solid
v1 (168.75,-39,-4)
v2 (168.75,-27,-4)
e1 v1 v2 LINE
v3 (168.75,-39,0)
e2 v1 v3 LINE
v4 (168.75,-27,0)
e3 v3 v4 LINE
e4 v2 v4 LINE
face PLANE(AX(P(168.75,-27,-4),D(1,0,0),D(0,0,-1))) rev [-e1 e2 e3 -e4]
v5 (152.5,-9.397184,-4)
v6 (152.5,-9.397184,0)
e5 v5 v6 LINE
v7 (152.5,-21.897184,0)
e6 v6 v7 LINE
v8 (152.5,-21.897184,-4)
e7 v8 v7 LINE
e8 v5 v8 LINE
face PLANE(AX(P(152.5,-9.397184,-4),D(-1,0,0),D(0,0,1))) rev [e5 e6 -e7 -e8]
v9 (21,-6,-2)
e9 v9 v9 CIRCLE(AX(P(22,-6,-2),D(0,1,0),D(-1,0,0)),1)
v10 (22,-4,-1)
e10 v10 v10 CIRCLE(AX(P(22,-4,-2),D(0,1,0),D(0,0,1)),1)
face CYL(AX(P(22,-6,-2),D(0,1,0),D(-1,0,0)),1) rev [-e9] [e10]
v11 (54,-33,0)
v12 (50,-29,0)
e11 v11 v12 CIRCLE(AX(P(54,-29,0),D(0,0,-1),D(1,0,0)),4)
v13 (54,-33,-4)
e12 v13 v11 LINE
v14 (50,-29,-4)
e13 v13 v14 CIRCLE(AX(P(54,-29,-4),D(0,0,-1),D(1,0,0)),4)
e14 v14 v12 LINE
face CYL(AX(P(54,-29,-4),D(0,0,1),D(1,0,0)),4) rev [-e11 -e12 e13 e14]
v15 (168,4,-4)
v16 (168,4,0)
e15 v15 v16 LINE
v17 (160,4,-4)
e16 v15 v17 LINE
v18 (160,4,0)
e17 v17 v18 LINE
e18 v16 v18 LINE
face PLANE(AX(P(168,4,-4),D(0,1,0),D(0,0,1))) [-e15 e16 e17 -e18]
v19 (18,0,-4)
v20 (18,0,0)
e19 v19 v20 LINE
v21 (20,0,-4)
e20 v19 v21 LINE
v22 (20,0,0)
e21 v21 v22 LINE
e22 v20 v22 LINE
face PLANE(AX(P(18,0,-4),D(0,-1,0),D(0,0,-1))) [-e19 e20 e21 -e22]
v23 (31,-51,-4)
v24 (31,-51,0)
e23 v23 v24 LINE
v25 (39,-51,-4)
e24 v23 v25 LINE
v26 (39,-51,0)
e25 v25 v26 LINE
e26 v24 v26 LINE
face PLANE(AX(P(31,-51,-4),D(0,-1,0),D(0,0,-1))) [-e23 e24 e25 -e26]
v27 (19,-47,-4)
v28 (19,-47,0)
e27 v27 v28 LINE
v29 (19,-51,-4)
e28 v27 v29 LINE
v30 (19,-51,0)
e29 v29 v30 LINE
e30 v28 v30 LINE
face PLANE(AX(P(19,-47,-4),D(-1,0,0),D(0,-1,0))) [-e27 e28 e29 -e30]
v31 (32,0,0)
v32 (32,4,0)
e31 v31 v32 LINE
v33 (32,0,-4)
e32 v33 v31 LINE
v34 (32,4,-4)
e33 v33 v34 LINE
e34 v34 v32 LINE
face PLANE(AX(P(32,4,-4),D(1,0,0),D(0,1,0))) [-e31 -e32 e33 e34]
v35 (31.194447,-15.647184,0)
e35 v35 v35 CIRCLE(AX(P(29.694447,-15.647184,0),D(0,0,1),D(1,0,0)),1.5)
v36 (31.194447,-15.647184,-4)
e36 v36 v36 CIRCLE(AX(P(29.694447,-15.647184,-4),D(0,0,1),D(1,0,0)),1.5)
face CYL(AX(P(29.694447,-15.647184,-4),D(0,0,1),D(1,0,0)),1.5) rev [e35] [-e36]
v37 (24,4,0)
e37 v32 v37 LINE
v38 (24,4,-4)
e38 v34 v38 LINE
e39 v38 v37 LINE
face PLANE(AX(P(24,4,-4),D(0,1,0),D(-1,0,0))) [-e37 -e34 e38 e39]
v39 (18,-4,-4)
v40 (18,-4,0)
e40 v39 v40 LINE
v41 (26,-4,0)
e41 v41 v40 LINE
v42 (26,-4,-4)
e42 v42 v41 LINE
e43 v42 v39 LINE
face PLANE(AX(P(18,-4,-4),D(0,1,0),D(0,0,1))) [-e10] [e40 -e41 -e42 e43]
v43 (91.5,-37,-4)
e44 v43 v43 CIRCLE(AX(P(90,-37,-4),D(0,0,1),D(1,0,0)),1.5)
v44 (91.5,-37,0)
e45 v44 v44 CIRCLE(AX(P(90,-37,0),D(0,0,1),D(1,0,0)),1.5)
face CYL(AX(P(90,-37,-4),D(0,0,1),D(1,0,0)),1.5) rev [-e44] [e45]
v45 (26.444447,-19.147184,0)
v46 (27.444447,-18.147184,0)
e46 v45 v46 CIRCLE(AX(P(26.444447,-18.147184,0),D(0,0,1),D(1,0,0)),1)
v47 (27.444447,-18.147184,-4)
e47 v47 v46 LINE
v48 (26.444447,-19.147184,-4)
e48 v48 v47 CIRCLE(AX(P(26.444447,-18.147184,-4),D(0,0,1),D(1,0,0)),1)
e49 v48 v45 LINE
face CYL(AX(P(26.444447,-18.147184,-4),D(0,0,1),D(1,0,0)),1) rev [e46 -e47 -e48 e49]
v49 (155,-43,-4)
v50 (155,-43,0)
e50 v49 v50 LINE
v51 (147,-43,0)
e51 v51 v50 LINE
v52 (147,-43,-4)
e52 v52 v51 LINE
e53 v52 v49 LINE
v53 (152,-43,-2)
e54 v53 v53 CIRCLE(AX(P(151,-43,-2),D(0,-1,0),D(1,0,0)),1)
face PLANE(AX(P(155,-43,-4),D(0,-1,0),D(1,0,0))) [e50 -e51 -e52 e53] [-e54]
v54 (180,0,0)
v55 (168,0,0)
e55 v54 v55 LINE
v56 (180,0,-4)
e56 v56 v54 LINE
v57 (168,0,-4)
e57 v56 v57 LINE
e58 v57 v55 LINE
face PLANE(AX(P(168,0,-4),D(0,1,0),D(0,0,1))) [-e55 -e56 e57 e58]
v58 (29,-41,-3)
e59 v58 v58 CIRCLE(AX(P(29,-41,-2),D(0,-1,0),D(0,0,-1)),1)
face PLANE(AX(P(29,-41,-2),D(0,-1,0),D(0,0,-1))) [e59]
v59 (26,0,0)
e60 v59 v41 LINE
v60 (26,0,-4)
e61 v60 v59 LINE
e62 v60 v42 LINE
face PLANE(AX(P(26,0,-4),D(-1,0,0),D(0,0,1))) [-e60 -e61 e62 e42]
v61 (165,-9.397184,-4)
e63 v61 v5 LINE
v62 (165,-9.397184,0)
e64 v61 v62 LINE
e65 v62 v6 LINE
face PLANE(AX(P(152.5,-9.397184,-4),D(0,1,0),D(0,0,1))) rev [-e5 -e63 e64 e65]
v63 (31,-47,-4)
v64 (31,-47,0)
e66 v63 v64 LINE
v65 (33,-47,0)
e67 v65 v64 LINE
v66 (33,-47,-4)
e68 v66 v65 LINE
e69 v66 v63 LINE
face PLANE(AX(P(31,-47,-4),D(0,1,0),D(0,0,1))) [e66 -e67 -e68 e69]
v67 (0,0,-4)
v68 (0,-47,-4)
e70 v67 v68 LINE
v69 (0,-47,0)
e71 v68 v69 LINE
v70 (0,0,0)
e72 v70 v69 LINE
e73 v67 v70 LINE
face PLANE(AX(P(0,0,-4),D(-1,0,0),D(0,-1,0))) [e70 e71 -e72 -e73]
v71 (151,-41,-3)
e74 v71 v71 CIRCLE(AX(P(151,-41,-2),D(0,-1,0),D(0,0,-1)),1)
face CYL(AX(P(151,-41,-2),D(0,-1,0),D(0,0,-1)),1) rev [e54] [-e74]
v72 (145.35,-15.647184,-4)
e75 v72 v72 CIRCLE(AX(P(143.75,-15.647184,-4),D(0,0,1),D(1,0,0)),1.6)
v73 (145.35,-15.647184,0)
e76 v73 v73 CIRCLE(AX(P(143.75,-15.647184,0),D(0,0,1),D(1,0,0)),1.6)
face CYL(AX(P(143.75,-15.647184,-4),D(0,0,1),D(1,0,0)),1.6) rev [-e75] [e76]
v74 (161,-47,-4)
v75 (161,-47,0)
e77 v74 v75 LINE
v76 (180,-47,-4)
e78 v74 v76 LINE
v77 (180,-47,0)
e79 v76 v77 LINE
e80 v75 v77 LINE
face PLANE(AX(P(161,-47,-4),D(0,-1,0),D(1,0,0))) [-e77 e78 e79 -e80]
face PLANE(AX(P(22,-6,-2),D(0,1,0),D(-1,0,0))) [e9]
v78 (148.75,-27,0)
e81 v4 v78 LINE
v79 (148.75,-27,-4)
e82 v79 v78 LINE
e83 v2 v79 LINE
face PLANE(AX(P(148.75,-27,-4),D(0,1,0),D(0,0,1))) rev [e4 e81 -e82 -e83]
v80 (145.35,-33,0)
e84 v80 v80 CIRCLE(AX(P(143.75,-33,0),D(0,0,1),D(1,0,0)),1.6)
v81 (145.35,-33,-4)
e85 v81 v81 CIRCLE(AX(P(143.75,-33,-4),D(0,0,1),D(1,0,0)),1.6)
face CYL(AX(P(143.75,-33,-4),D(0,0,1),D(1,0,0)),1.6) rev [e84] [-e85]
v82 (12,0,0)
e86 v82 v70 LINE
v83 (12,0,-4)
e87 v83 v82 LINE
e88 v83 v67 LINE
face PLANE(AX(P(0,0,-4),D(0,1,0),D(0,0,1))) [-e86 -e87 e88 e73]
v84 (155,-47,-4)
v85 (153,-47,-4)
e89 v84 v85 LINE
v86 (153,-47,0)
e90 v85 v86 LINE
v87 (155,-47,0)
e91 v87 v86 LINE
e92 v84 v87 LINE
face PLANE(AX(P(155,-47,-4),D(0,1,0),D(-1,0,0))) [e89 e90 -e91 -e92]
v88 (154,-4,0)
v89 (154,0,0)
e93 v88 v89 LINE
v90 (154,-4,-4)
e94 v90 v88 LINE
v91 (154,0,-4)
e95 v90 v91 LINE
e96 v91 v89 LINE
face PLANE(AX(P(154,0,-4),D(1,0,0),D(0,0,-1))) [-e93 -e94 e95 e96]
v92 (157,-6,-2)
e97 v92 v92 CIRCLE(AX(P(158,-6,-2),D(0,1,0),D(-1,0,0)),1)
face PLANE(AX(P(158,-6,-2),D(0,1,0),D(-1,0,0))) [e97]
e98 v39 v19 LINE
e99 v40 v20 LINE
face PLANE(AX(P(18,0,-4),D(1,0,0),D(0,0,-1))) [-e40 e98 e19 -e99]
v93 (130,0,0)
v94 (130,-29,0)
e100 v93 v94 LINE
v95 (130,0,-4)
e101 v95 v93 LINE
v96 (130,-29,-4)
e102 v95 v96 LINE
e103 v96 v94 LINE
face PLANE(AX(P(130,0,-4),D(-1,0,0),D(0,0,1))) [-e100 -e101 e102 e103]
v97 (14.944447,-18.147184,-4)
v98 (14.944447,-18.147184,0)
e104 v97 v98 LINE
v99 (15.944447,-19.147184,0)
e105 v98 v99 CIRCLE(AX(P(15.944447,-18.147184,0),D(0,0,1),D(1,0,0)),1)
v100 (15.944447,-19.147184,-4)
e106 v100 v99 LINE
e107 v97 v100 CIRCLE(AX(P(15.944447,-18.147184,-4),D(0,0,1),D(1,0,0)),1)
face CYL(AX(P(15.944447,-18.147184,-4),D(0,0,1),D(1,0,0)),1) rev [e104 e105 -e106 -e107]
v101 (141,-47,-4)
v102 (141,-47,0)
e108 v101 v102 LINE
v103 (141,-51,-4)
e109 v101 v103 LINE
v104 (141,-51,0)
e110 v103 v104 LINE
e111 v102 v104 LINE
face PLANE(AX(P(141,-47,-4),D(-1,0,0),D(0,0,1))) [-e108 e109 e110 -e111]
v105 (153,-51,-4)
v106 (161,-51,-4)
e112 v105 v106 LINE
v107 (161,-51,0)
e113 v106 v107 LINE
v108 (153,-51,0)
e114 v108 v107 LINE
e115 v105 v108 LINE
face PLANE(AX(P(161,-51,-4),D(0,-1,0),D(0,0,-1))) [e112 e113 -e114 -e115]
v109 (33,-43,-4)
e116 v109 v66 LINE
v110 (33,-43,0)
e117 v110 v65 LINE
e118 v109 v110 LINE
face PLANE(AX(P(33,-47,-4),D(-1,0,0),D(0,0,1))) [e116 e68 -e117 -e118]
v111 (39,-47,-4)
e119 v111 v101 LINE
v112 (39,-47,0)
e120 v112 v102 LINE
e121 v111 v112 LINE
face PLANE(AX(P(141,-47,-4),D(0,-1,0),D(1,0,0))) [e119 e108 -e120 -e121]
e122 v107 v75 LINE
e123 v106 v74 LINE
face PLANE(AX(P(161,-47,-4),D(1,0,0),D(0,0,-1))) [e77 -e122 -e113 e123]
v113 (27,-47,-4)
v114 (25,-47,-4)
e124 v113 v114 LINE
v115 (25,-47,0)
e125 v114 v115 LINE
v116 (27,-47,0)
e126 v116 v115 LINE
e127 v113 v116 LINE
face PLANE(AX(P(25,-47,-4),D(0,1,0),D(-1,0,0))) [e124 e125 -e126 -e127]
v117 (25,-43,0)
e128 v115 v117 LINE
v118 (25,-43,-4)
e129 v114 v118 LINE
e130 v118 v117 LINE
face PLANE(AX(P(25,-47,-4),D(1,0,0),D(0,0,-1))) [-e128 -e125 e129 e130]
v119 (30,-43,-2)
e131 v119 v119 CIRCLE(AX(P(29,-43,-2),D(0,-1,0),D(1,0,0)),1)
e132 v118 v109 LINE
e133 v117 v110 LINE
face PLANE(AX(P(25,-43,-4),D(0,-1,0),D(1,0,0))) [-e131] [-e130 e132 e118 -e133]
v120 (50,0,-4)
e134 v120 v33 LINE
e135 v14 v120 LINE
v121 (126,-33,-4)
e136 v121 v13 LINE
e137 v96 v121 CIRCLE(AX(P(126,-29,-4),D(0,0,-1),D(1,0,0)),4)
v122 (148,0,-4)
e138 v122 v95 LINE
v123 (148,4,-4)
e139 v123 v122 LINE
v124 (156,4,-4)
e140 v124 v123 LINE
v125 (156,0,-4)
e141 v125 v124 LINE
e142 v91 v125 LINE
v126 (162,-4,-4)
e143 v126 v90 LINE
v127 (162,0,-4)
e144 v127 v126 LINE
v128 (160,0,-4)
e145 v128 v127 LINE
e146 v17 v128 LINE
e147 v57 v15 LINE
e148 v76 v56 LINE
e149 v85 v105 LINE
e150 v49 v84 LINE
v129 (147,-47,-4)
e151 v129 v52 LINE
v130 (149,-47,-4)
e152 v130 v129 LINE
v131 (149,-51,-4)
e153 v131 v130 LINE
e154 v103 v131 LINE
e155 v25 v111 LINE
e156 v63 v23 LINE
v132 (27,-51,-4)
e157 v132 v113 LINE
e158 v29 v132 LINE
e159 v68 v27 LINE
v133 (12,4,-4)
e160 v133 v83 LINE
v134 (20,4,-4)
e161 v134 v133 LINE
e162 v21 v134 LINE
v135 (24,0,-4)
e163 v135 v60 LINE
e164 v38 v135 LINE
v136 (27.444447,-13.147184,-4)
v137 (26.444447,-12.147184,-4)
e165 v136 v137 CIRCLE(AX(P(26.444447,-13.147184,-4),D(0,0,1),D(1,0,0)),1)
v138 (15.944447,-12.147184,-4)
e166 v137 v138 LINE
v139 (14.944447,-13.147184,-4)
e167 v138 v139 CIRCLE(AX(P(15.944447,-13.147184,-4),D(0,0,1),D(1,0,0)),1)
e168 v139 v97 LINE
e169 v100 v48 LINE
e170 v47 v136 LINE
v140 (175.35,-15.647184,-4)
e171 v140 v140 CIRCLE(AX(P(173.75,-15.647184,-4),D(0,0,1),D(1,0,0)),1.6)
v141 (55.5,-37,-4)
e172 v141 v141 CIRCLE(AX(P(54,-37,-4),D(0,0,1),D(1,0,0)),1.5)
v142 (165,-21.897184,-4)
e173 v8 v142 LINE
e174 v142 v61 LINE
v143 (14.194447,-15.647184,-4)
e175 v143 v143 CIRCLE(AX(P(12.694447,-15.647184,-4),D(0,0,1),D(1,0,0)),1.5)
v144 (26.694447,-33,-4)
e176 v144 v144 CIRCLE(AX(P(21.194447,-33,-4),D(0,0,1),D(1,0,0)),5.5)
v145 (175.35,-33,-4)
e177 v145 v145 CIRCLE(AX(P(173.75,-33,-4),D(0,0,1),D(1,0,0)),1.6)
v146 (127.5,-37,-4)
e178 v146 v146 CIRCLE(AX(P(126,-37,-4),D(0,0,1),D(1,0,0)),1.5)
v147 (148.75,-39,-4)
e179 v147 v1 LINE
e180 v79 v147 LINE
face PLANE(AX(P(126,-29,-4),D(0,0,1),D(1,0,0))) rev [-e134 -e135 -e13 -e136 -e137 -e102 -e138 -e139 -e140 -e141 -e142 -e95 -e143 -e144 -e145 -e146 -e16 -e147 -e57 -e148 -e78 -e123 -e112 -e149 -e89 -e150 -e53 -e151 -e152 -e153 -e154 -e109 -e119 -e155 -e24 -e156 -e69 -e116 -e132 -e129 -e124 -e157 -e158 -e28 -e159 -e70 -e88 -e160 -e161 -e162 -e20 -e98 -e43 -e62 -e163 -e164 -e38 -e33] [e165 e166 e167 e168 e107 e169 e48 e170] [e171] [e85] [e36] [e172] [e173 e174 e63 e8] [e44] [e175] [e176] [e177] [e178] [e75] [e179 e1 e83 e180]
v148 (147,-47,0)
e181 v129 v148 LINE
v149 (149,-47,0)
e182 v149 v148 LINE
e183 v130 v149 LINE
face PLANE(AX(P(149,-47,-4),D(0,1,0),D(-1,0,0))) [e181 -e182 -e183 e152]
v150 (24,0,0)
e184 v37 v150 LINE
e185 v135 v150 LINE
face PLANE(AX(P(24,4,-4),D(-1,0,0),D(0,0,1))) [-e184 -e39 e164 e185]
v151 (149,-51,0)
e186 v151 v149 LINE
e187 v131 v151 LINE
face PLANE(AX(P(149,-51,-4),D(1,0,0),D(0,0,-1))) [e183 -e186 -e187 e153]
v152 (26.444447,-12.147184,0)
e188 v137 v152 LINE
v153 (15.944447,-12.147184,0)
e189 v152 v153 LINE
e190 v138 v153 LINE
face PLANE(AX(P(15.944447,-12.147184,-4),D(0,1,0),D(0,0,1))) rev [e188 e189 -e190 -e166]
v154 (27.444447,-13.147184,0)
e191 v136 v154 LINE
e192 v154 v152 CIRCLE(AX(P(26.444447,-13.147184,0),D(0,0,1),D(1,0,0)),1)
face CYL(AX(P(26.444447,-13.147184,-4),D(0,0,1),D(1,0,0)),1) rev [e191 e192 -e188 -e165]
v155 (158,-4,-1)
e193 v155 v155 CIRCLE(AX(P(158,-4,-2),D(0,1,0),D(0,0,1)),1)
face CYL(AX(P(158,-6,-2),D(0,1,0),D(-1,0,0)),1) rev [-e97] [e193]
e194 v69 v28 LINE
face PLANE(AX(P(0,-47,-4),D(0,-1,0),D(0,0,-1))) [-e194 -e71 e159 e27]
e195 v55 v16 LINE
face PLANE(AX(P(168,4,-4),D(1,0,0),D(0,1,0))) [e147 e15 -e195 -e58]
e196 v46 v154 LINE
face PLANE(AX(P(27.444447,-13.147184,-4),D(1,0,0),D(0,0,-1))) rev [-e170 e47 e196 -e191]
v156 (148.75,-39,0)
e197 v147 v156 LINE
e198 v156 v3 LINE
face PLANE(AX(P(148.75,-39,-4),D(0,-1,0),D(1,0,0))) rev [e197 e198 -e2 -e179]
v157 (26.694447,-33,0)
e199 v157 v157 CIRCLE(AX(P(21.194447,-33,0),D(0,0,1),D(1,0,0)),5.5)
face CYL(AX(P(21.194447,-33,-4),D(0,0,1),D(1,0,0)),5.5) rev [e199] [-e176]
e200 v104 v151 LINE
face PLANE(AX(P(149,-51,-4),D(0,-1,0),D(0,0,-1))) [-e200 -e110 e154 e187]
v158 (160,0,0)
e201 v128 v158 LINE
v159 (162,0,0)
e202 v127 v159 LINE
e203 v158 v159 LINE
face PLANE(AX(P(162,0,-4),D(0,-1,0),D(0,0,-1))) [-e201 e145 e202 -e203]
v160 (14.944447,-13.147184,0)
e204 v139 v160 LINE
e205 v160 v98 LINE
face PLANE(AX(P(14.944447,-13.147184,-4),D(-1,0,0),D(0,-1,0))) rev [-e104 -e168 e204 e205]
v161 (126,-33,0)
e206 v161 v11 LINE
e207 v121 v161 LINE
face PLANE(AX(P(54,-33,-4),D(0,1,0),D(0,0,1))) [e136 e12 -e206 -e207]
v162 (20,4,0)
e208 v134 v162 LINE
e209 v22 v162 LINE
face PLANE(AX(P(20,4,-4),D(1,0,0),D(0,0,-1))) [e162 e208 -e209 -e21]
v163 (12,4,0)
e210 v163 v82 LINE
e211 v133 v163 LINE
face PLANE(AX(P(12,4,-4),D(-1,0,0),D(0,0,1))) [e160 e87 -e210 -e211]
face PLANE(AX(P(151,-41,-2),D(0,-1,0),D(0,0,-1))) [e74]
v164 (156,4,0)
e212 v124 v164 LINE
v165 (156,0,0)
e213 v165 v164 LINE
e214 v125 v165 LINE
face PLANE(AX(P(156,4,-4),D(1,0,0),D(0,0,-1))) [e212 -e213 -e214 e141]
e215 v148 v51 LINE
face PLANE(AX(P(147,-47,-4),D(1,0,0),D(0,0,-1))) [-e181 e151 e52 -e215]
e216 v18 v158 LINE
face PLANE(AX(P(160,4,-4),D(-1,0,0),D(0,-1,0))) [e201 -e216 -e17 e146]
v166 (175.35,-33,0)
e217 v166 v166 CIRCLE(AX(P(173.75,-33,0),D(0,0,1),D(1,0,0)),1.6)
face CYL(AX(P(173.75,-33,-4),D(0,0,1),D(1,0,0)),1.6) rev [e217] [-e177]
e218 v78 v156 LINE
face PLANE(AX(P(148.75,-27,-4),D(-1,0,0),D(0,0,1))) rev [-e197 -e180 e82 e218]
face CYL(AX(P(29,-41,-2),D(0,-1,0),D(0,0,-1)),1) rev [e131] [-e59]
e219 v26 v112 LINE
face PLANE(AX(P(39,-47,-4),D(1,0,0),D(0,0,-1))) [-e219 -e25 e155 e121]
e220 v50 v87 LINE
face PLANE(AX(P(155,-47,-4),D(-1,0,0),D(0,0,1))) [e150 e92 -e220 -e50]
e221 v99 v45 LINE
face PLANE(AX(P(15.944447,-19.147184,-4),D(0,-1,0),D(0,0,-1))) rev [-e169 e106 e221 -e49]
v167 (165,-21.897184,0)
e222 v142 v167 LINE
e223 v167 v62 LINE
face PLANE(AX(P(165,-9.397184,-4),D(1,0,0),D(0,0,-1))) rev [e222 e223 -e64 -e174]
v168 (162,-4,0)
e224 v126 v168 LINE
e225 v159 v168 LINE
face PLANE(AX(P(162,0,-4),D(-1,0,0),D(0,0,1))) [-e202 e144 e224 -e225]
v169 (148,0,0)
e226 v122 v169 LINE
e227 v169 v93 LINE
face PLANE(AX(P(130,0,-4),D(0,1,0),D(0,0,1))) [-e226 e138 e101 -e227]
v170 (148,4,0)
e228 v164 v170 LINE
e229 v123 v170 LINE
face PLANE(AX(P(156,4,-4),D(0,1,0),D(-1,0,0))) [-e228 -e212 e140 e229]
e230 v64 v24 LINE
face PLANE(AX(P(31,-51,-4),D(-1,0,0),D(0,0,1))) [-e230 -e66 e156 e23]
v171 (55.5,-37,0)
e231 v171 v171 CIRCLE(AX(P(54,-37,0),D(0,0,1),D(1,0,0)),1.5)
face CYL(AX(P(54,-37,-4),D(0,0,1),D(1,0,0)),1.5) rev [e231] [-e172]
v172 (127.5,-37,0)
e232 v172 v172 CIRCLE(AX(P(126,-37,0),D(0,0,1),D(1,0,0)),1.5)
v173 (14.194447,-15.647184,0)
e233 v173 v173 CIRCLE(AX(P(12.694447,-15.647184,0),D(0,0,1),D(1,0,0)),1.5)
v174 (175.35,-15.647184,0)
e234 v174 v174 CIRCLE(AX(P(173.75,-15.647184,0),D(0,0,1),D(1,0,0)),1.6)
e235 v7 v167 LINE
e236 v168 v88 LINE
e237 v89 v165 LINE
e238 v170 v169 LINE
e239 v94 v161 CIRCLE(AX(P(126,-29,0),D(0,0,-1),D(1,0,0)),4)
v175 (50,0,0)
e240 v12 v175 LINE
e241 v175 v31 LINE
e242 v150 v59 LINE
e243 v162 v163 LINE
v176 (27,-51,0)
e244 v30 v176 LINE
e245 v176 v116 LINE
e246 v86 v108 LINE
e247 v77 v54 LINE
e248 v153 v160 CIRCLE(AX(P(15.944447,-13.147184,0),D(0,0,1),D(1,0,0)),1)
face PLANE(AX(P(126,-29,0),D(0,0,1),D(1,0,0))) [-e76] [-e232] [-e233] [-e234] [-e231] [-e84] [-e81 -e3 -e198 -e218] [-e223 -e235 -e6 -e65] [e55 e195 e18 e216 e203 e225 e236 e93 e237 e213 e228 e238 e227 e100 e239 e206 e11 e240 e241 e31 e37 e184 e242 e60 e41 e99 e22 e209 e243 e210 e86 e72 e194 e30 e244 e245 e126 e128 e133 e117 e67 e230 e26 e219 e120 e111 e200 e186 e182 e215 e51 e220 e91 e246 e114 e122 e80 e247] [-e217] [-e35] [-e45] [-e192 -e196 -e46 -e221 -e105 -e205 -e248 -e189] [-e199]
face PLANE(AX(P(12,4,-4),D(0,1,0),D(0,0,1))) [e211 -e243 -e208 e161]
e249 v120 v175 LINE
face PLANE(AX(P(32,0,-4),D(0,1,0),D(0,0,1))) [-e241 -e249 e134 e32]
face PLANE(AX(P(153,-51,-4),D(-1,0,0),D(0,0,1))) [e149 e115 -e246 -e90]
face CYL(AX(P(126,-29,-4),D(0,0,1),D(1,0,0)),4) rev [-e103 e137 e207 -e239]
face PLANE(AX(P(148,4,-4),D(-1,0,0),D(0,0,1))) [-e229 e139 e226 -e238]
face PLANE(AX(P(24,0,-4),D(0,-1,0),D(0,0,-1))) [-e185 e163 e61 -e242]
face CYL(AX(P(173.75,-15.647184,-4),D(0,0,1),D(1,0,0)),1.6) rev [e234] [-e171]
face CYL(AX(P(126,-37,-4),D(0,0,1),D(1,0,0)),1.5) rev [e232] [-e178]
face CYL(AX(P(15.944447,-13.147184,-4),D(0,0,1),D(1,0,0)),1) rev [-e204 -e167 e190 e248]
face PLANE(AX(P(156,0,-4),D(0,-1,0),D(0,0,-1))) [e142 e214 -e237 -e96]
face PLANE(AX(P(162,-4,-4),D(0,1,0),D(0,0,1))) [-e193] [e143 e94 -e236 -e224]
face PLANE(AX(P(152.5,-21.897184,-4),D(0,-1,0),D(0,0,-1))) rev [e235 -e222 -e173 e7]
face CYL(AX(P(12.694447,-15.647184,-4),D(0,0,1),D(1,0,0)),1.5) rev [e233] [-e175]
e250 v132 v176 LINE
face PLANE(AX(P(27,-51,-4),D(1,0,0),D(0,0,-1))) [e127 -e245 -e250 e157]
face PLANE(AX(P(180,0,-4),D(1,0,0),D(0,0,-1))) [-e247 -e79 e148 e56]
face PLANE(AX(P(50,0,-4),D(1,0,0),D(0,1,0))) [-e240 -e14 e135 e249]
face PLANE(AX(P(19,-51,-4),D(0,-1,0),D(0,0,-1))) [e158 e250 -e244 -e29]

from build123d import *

# Parameters (mm, degrees)
SKETCH_1_R             = 1.6
SKETCH_1_R_2           = 5.5
SKETCH_1_R_3           = 1.5
SKETCH_1_W             = 12.5
SKETCH_1_H             = 12.5
SKETCH_1_W_2           = 20
SKETCH_1_H_2           = 12
SM_BASE_FLANGE_1_DEPTH = 4
SKETCH_6_R             = 1
CUT_EXTRUDE_1_DEPTH    = 10
SKETCH_7_R             = 1
CUT_EXTRUDE_2_DEPTH    = 10


# Sheet-metal steps are written as plain solids
with BuildPart() as part:
    # Sketch 1 → Базовая кромка1 (new body)
    with BuildSketch(Plane.XY):
        with BuildLine():
            Line((0, 0), (12, 0))
            Line((12, 0), (12, 4))
            Line((12, 4), (20, 4))
            Line((20, 4), (20, 0))
            Line((20, 0), (18, 0))
            Line((18, 0), (18, -4))
            Line((18, -4), (26, -4))
            Line((26, -4), (26, 0))
            Line((26, 0), (24, 0))
            Line((24, 0), (24, 4))
            Line((24, 4), (32, 4))
            Line((32, 4), (32, 0))
            Line((32, 0), (50, 0))
            Line((50, 0), (50, -29))
            ThreePointArc((50, -29), (51.171572875, -31.828427125), (54, -33))
            Line((54, -33), (126, -33))
            ThreePointArc((126, -33), (128.828427125, -31.828427125), (130, -29))
            Line((130, -29), (130, 0))
            Line((130, 0), (148, 0))
            Line((148, 0), (148, 4))
            Line((148, 4), (156, 4))
            Line((156, 4), (156, 0))
            Line((156, 0), (154, 0))
            Line((154, 0), (154, -4))
            Line((154, -4), (162, -4))
            Line((162, -4), (162, 0))
            Line((162, 0), (160, 0))
            Line((160, 0), (160, 4))
            Line((160, 4), (168, 4))
            Line((168, 4), (168, 0))
            Line((168, 0), (180, 0))
            Line((180, 0), (180, -47))
            Line((180, -47), (161, -47))
            Line((161, -47), (161, -51))
            Line((161, -51), (153, -51))
            Line((153, -51), (153, -47))
            Line((153, -47), (155, -47))
            Line((155, -47), (155, -43))
            Line((155, -43), (147, -43))
            Line((147, -43), (147, -47))
            Line((147, -47), (149, -47))
            Line((149, -47), (149, -51))
            Line((149, -51), (141, -51))
            Line((141, -51), (141, -47))
            Line((141, -47), (90, -47))
            Line((90, -47), (39, -47))
            Line((39, -47), (39, -51))
            Line((39, -51), (31, -51))
            Line((31, -51), (31, -47))
            Line((31, -47), (33, -47))
            Line((33, -47), (33, -43))
            Line((33, -43), (25, -43))
            Line((25, -43), (25, -47))
            Line((25, -47), (27, -47))
            Line((27, -47), (27, -51))
            Line((27, -51), (19, -51))
            Line((19, -51), (19, -47))
            Line((19, -47), (0, -47))
            Line((0, -47), (0, 0))
        make_face()
        with Locations((143.75, -15.647183543)):
            Circle(SKETCH_1_R, mode=Mode.SUBTRACT)
        with Locations((173.75, -15.647183543)):
            Circle(SKETCH_1_R, mode=Mode.SUBTRACT)
        with Locations((143.75, -33)):
            Circle(SKETCH_1_R, mode=Mode.SUBTRACT)
        with Locations((173.75, -33)):
            Circle(SKETCH_1_R, mode=Mode.SUBTRACT)
        with Locations((21.194446521, -33)):
            Circle(SKETCH_1_R_2, mode=Mode.SUBTRACT)
        with Locations((90, -37)):
            Circle(SKETCH_1_R_3, mode=Mode.SUBTRACT)
        with Locations((54, -37)):
            Circle(SKETCH_1_R_3, mode=Mode.SUBTRACT)
        with Locations((126, -37)):
            Circle(SKETCH_1_R_3, mode=Mode.SUBTRACT)
        with Locations((12.694446521, -15.647183543)):
            Circle(SKETCH_1_R_3, mode=Mode.SUBTRACT)
        with Locations((29.694446521, -15.647183543)):
            Circle(SKETCH_1_R_3, mode=Mode.SUBTRACT)
        with Locations((158.75, -15.647183543)):
            Rectangle(SKETCH_1_W, SKETCH_1_H, mode=Mode.SUBTRACT)
        with Locations((158.75, -33)):
            Rectangle(SKETCH_1_W_2, SKETCH_1_H_2, mode=Mode.SUBTRACT)
        with BuildLine():
            Line((15.944446521, -12.147183543), (26.444446521, -12.147183543))
            ThreePointArc((26.444446521, -12.147183543), (27.151553303, -12.440076762), (27.444446521, -13.147183543))
            Line((27.444446521, -13.147183543), (27.444446521, -18.147183543))
            ThreePointArc((27.444446521, -18.147183543), (27.151553303, -18.854290324), (26.444446521, -19.147183543))
            Line((26.444446521, -19.147183543), (15.944446521, -19.147183543))
            ThreePointArc((15.944446521, -19.147183543), (15.23733974, -18.854290324), (14.944446521, -18.147183543))
            Line((14.944446521, -18.147183543), (14.944446521, -13.147183543))
            ThreePointArc((14.944446521, -13.147183543), (15.23733974, -12.440076762), (15.944446521, -12.147183543))
        make_face(mode=Mode.SUBTRACT)
    extrude(amount=-SM_BASE_FLANGE_1_DEPTH)

    # Эскиз6 → Вырез-Вытянуть1 (cut)
    with BuildSketch(Plane(origin=(0, 4, 0), x_dir=(1, 0, 0), z_dir=(0, 1, 0))):
        with Locations(Location((22, 2, 0), (0, 0, 180))):
            Circle(SKETCH_6_R)
        with Locations(Location((158, 2, 0), (0, 0, 180))):
            Circle(SKETCH_6_R)
    extrude(amount=-CUT_EXTRUDE_1_DEPTH, mode=Mode.SUBTRACT)

    # Эскиз7 → Вырез-Вытянуть2 (cut)
    with BuildSketch(Plane.XZ.offset(51)):
        with Locations(Location((29, -2, 0), (0, 0, 270))):
            Circle(SKETCH_7_R)
        with Locations(Location((151, -2, 0), (0, 0, 270))):
            Circle(SKETCH_7_R)
    extrude(amount=-CUT_EXTRUDE_2_DEPTH, mode=Mode.SUBTRACT)


solid = part.part
